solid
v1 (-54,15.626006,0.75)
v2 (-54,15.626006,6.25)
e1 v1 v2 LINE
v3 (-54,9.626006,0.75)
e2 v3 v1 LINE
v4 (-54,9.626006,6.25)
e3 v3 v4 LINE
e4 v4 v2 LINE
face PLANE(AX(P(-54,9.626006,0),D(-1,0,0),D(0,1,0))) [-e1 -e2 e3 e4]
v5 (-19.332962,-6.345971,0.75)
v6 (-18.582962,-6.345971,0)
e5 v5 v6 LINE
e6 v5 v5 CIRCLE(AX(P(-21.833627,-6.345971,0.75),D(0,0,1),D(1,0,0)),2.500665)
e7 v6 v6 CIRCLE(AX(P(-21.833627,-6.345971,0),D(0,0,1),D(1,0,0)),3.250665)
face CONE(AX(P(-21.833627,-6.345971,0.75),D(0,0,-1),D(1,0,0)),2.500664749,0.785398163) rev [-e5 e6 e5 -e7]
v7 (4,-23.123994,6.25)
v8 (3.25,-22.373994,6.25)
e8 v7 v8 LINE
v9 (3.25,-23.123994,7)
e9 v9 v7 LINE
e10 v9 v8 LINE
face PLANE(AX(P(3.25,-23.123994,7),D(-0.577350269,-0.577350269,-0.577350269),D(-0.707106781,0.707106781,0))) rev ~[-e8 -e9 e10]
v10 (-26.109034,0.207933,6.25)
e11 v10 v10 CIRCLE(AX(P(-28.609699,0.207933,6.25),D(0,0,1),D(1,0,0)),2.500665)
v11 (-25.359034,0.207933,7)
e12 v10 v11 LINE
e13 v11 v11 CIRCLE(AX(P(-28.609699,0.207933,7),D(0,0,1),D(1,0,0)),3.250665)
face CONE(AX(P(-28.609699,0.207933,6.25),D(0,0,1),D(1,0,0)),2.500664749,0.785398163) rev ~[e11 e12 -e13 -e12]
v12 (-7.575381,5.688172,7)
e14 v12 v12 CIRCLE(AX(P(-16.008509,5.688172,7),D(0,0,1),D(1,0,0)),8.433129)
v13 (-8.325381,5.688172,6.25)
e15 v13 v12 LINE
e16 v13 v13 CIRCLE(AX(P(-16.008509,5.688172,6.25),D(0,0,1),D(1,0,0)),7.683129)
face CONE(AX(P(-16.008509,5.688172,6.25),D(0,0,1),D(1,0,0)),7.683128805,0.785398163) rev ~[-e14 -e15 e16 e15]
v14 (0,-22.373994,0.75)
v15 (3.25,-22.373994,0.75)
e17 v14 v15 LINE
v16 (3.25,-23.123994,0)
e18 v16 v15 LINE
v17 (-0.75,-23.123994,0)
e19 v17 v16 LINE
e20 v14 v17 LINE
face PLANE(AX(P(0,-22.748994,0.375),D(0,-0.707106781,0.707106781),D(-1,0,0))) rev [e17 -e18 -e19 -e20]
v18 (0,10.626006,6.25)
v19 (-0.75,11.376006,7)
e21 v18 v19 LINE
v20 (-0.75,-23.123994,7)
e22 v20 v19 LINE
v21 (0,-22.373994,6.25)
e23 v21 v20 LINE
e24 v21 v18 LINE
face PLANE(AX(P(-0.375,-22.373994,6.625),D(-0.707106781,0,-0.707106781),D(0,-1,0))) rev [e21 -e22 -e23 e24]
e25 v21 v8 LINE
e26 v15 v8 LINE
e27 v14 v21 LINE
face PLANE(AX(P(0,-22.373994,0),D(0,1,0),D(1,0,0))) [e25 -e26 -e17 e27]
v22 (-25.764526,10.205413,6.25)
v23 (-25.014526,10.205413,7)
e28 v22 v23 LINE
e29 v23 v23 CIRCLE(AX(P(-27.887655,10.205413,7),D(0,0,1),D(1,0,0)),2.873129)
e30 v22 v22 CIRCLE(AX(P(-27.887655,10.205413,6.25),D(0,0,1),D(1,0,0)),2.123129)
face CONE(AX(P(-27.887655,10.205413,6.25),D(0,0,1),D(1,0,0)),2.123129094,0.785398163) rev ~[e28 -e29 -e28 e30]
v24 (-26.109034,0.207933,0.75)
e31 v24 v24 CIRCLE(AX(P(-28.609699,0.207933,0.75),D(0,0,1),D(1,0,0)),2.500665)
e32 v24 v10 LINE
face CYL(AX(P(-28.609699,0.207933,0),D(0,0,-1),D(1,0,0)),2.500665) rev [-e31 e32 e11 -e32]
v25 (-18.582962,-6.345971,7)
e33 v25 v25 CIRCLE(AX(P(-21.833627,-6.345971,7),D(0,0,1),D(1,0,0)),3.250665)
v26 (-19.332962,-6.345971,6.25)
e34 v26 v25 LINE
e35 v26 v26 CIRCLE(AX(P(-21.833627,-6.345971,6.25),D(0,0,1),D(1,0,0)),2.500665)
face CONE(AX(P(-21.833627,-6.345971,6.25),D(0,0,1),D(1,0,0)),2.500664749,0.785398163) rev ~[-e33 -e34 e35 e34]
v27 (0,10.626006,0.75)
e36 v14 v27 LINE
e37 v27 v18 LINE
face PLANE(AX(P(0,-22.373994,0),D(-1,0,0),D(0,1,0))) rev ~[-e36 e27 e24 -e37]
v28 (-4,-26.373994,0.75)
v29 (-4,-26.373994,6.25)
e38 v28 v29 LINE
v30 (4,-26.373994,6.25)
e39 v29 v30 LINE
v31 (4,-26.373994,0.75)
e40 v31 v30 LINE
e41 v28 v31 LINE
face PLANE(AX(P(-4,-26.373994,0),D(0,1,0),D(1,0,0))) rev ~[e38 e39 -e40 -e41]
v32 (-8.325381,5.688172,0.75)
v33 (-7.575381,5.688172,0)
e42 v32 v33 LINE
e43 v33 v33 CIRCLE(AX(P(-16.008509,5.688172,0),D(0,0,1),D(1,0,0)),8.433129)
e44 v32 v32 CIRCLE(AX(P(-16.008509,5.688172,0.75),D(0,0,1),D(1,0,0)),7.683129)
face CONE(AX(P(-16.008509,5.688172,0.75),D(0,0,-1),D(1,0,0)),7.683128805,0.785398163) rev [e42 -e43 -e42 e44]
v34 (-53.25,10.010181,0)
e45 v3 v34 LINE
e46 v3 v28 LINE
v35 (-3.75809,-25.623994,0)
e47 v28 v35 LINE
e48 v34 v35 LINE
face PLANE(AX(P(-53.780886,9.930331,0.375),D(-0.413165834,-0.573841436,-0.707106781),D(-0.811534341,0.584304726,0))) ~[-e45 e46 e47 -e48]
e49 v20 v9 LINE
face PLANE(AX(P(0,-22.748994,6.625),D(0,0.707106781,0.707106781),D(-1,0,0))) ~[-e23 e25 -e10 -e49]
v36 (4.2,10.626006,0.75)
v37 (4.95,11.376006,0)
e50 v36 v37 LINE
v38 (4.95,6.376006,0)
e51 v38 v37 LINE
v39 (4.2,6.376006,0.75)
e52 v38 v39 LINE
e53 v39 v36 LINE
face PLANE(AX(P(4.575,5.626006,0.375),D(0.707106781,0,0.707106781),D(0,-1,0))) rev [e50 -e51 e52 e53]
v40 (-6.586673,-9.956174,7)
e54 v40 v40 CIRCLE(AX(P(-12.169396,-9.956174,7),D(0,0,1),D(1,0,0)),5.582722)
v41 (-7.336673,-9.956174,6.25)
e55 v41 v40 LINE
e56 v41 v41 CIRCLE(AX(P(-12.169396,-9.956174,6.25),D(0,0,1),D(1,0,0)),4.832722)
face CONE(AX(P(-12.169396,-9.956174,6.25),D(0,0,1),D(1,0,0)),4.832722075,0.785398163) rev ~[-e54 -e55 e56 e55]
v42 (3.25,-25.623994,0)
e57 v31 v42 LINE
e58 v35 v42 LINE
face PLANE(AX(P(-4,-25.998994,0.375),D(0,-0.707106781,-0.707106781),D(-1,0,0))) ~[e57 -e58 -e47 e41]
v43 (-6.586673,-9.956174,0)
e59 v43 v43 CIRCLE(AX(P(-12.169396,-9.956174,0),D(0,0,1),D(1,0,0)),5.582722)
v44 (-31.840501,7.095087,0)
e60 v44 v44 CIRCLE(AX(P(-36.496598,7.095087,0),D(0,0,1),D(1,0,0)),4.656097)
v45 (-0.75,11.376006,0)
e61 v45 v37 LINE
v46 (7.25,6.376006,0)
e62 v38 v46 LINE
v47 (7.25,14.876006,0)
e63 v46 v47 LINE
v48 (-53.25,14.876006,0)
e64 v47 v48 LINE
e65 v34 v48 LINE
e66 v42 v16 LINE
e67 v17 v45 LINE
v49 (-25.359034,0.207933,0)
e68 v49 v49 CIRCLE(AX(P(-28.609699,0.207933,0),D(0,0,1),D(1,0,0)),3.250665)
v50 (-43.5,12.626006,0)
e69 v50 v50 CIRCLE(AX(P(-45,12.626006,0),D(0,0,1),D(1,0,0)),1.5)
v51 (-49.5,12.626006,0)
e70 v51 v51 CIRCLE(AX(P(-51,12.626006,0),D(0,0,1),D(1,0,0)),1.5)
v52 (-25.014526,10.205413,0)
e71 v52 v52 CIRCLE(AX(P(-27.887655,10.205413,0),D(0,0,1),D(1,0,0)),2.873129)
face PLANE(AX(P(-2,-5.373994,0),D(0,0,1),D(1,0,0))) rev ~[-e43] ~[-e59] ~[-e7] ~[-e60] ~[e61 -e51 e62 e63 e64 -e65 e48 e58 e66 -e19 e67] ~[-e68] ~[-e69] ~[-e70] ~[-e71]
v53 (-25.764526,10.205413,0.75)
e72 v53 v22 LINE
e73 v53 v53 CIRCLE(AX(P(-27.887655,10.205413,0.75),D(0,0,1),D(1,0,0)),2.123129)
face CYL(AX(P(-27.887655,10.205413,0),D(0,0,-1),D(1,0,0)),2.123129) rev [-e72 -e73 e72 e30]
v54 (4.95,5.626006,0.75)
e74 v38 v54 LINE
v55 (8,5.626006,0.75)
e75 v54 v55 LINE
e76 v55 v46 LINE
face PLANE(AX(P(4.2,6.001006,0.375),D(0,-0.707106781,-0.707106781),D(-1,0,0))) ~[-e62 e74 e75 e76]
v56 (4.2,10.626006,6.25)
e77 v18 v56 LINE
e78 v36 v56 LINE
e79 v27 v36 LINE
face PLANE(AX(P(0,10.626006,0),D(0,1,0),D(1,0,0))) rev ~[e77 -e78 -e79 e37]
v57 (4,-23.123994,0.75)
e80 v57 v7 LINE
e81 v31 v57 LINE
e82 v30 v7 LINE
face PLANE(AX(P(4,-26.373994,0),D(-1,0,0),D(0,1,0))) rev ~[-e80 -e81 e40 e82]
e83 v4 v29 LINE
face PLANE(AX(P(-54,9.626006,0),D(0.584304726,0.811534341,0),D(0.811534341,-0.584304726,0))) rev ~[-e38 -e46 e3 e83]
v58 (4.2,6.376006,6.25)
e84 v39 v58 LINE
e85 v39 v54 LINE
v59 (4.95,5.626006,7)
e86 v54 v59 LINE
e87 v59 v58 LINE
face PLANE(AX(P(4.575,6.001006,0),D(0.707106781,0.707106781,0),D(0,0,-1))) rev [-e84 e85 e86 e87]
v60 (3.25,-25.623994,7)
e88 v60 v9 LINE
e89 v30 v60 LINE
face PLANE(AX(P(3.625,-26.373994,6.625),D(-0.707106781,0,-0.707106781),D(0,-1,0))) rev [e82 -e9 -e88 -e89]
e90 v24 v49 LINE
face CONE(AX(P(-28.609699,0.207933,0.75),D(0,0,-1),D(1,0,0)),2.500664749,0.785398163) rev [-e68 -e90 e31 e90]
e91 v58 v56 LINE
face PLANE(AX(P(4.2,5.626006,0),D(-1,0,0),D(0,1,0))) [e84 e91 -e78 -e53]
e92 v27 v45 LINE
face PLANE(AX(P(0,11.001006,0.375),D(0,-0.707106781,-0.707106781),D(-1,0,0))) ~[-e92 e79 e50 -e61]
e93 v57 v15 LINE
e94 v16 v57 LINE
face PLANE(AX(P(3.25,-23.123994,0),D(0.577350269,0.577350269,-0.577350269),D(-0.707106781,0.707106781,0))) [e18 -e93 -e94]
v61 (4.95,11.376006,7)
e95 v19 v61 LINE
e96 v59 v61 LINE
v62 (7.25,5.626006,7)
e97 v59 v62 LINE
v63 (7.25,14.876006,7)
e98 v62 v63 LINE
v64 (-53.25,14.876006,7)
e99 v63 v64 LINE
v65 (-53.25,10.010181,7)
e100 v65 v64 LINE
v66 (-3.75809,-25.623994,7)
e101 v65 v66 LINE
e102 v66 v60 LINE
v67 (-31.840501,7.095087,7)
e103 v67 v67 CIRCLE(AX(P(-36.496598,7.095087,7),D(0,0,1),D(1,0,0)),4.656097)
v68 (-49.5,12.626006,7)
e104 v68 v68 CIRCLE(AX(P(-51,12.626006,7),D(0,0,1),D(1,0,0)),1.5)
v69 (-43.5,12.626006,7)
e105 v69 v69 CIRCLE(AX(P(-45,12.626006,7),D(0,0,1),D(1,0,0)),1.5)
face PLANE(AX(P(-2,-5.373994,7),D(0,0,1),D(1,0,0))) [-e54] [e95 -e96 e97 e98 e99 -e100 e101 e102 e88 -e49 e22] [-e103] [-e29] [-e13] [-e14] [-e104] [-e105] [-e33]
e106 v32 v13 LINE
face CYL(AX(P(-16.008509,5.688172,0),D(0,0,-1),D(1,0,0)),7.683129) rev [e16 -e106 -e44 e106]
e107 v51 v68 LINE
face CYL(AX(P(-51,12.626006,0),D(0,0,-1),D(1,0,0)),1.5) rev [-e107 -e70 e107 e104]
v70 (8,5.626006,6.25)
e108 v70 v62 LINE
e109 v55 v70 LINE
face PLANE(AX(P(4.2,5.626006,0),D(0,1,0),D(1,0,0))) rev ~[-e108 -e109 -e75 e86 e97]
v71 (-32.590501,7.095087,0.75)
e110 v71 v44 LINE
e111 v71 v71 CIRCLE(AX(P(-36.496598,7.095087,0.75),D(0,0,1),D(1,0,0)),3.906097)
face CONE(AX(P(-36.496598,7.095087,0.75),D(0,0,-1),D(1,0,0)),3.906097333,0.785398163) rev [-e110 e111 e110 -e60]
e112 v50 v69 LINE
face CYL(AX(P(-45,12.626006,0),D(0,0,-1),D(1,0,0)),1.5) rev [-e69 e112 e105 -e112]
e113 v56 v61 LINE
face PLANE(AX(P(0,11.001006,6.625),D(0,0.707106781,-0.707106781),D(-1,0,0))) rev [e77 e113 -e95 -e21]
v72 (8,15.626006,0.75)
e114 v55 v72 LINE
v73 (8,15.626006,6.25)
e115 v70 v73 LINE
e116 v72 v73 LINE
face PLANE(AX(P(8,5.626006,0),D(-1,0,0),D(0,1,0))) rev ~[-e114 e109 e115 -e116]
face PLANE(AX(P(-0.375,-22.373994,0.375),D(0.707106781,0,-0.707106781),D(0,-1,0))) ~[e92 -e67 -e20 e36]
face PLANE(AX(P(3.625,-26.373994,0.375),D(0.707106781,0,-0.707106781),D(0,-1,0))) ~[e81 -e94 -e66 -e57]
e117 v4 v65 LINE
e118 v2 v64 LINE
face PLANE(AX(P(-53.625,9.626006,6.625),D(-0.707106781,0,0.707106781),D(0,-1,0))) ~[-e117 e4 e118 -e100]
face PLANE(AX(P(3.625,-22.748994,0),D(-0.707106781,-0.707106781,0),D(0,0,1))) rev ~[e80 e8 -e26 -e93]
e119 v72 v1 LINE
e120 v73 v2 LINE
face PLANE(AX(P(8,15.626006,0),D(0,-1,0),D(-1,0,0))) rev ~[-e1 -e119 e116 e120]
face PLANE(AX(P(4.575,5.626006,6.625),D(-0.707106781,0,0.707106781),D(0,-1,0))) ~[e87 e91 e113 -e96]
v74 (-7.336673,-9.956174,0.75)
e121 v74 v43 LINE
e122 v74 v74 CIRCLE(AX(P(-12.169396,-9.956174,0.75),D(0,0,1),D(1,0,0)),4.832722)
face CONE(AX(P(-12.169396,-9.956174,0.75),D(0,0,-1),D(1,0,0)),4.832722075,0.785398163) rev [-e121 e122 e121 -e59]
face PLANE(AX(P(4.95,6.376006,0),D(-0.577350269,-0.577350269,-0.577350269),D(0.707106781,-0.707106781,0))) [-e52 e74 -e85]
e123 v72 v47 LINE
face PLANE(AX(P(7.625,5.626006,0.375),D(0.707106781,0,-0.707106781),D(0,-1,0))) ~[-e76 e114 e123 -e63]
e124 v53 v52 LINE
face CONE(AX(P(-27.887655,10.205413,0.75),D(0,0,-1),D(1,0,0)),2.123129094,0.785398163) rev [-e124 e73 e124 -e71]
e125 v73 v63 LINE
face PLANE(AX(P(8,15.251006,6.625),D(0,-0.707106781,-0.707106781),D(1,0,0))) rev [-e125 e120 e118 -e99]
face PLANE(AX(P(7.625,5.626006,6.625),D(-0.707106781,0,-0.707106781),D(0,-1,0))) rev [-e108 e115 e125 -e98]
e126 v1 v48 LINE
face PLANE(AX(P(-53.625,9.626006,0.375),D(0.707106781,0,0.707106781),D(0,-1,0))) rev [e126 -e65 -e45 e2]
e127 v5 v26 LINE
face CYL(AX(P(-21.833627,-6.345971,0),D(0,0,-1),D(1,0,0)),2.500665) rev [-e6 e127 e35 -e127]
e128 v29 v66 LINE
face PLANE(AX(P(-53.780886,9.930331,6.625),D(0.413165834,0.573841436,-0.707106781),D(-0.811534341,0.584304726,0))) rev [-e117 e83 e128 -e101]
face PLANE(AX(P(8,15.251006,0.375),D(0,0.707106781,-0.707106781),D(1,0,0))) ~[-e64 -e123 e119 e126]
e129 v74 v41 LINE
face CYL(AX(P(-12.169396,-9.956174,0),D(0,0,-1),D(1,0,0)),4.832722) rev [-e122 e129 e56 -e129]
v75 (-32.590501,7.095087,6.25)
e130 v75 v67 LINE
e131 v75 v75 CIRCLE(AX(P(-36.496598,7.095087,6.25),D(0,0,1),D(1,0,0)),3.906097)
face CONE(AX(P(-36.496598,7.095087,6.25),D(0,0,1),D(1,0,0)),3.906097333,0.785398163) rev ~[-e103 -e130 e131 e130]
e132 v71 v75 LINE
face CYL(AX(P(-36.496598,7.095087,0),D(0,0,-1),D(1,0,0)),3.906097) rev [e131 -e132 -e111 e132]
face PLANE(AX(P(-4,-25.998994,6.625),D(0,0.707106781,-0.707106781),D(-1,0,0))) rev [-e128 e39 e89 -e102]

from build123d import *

# Parameters (mm, degrees)
F0_W     = 3.8
F0_H     = 5
F0_W_2   = 4
F0_H_2   = 4
F0_R     = 2.5006647493
F0_R_2   = 4.8327220748
F0_R_3   = 3.906097333
F0_R_4   = 2.1231290944
F0_R_5   = 7.6831288046
F0_W_3   = 12
F0_H_3   = 6
F0_R_6   = 1.5
F1_DEPTH = 7
F2_SIZE  = 0.75


# Not quite as in the source:
# - a feature names something its author has since deleted; it is built from what else it names


with BuildPart() as f1:
    # F0 (on Top) → F1 (new body)
    with BuildSketch(Plane.XY):
        Polygon((0, 10.6260057762), (0, 15.6260057762), (-4, 15.6260057762), (-4, -26.3739942238), (0, -26.3739942238), (0, -22.3739942238), align=None)
        Polygon((8, 15.6260057762), (0, 15.6260057762), (0, 10.6260057762), (4.2, 10.6260057762), (8, 10.6260057762), align=None)
        with Locations((6.1, 8.1260057762)):
            Rectangle(F0_W, F0_H)
        with Locations((2, -24.3739942238)):
            Rectangle(F0_W_2, F0_H_2)
        Polygon((-4, -26.3739942238), (-4, 15.6260057762), (-42, 15.6260057762), (-42, 9.6260057762), (-54, 9.6260057762), align=None)
        with Locations((-21.8336265534, -6.3459714875)):
            Circle(F0_R, mode=Mode.SUBTRACT)
        with Locations((-12.1693955734, -9.9561735988)):
            Circle(F0_R_2, mode=Mode.SUBTRACT)
        with Locations((-28.6096986383, 0.2079327387)):
            Circle(F0_R, mode=Mode.SUBTRACT)
        with Locations((-36.4965982735, 7.095086854)):
            Circle(F0_R_3, mode=Mode.SUBTRACT)
        with Locations((-27.8876554221, 10.2054132149)):
            Circle(F0_R_4, mode=Mode.SUBTRACT)
        with Locations((-16.008509323, 5.6881718338)):
            Circle(F0_R_5, mode=Mode.SUBTRACT)
        with Locations((-48, 12.6260057762)):
            Rectangle(F0_W_3, F0_H_3)
        with Locations((-51, 12.6260057762)):
            Circle(F0_R_6, mode=Mode.SUBTRACT)
        with Locations((-45, 12.6260057762)):
            Circle(F0_R_6, mode=Mode.SUBTRACT)
    extrude(amount=F1_DEPTH)

    # F2
    f2_edges = [f1.edges().sort_by_distance(p)[0] for p in [
        (4.2, 5.626006, 3.5),
        (4, -22.373994, 3.5),
        (-17.002118, -9.956174, 0),
        (-31.110363, 0.207933, 0),
        (-40.402696, 7.095087, 7),
        (-40.402696, 7.095087, 0),
        (-30.010785, 10.205413, 0),
        (-23.691638, 5.688172, 0),
        (0, -5.873994, 0),
        (2.1, 10.626006, 0),
        (4.2, 8.126006, 0),
        (6.1, 5.626006, 0),
        (8, 10.626006, 0),
        (-23, 15.626006, 0),
        (-54, 12.626006, 0),
        (-29, -8.373994, 0),
        (0, -26.373994, 0),
        (4, -24.373994, 0),
        (2, -22.373994, 0),
        (-23, 15.626006, 7),
        (-54, 12.626006, 7),
        (-29, -8.373994, 7),
        (-30.010785, 10.205413, 7),
        (-31.110363, 0.207933, 7),
        (-23.691638, 5.688172, 7),
        (-17.002118, -9.956174, 7),
        (0, -26.373994, 7),
        (4, -24.373994, 7),
        (2, -22.373994, 7),
        (0, -5.873994, 7),
        (8, 10.626006, 7),
        (2.1, 10.626006, 7),
        (4.2, 8.126006, 7),
        (-24.334291, -6.345971, 7),
        (-24.334291, -6.345971, 0),
    ]]
    chamfer(f2_edges, length=F2_SIZE)


solid = f1.part
